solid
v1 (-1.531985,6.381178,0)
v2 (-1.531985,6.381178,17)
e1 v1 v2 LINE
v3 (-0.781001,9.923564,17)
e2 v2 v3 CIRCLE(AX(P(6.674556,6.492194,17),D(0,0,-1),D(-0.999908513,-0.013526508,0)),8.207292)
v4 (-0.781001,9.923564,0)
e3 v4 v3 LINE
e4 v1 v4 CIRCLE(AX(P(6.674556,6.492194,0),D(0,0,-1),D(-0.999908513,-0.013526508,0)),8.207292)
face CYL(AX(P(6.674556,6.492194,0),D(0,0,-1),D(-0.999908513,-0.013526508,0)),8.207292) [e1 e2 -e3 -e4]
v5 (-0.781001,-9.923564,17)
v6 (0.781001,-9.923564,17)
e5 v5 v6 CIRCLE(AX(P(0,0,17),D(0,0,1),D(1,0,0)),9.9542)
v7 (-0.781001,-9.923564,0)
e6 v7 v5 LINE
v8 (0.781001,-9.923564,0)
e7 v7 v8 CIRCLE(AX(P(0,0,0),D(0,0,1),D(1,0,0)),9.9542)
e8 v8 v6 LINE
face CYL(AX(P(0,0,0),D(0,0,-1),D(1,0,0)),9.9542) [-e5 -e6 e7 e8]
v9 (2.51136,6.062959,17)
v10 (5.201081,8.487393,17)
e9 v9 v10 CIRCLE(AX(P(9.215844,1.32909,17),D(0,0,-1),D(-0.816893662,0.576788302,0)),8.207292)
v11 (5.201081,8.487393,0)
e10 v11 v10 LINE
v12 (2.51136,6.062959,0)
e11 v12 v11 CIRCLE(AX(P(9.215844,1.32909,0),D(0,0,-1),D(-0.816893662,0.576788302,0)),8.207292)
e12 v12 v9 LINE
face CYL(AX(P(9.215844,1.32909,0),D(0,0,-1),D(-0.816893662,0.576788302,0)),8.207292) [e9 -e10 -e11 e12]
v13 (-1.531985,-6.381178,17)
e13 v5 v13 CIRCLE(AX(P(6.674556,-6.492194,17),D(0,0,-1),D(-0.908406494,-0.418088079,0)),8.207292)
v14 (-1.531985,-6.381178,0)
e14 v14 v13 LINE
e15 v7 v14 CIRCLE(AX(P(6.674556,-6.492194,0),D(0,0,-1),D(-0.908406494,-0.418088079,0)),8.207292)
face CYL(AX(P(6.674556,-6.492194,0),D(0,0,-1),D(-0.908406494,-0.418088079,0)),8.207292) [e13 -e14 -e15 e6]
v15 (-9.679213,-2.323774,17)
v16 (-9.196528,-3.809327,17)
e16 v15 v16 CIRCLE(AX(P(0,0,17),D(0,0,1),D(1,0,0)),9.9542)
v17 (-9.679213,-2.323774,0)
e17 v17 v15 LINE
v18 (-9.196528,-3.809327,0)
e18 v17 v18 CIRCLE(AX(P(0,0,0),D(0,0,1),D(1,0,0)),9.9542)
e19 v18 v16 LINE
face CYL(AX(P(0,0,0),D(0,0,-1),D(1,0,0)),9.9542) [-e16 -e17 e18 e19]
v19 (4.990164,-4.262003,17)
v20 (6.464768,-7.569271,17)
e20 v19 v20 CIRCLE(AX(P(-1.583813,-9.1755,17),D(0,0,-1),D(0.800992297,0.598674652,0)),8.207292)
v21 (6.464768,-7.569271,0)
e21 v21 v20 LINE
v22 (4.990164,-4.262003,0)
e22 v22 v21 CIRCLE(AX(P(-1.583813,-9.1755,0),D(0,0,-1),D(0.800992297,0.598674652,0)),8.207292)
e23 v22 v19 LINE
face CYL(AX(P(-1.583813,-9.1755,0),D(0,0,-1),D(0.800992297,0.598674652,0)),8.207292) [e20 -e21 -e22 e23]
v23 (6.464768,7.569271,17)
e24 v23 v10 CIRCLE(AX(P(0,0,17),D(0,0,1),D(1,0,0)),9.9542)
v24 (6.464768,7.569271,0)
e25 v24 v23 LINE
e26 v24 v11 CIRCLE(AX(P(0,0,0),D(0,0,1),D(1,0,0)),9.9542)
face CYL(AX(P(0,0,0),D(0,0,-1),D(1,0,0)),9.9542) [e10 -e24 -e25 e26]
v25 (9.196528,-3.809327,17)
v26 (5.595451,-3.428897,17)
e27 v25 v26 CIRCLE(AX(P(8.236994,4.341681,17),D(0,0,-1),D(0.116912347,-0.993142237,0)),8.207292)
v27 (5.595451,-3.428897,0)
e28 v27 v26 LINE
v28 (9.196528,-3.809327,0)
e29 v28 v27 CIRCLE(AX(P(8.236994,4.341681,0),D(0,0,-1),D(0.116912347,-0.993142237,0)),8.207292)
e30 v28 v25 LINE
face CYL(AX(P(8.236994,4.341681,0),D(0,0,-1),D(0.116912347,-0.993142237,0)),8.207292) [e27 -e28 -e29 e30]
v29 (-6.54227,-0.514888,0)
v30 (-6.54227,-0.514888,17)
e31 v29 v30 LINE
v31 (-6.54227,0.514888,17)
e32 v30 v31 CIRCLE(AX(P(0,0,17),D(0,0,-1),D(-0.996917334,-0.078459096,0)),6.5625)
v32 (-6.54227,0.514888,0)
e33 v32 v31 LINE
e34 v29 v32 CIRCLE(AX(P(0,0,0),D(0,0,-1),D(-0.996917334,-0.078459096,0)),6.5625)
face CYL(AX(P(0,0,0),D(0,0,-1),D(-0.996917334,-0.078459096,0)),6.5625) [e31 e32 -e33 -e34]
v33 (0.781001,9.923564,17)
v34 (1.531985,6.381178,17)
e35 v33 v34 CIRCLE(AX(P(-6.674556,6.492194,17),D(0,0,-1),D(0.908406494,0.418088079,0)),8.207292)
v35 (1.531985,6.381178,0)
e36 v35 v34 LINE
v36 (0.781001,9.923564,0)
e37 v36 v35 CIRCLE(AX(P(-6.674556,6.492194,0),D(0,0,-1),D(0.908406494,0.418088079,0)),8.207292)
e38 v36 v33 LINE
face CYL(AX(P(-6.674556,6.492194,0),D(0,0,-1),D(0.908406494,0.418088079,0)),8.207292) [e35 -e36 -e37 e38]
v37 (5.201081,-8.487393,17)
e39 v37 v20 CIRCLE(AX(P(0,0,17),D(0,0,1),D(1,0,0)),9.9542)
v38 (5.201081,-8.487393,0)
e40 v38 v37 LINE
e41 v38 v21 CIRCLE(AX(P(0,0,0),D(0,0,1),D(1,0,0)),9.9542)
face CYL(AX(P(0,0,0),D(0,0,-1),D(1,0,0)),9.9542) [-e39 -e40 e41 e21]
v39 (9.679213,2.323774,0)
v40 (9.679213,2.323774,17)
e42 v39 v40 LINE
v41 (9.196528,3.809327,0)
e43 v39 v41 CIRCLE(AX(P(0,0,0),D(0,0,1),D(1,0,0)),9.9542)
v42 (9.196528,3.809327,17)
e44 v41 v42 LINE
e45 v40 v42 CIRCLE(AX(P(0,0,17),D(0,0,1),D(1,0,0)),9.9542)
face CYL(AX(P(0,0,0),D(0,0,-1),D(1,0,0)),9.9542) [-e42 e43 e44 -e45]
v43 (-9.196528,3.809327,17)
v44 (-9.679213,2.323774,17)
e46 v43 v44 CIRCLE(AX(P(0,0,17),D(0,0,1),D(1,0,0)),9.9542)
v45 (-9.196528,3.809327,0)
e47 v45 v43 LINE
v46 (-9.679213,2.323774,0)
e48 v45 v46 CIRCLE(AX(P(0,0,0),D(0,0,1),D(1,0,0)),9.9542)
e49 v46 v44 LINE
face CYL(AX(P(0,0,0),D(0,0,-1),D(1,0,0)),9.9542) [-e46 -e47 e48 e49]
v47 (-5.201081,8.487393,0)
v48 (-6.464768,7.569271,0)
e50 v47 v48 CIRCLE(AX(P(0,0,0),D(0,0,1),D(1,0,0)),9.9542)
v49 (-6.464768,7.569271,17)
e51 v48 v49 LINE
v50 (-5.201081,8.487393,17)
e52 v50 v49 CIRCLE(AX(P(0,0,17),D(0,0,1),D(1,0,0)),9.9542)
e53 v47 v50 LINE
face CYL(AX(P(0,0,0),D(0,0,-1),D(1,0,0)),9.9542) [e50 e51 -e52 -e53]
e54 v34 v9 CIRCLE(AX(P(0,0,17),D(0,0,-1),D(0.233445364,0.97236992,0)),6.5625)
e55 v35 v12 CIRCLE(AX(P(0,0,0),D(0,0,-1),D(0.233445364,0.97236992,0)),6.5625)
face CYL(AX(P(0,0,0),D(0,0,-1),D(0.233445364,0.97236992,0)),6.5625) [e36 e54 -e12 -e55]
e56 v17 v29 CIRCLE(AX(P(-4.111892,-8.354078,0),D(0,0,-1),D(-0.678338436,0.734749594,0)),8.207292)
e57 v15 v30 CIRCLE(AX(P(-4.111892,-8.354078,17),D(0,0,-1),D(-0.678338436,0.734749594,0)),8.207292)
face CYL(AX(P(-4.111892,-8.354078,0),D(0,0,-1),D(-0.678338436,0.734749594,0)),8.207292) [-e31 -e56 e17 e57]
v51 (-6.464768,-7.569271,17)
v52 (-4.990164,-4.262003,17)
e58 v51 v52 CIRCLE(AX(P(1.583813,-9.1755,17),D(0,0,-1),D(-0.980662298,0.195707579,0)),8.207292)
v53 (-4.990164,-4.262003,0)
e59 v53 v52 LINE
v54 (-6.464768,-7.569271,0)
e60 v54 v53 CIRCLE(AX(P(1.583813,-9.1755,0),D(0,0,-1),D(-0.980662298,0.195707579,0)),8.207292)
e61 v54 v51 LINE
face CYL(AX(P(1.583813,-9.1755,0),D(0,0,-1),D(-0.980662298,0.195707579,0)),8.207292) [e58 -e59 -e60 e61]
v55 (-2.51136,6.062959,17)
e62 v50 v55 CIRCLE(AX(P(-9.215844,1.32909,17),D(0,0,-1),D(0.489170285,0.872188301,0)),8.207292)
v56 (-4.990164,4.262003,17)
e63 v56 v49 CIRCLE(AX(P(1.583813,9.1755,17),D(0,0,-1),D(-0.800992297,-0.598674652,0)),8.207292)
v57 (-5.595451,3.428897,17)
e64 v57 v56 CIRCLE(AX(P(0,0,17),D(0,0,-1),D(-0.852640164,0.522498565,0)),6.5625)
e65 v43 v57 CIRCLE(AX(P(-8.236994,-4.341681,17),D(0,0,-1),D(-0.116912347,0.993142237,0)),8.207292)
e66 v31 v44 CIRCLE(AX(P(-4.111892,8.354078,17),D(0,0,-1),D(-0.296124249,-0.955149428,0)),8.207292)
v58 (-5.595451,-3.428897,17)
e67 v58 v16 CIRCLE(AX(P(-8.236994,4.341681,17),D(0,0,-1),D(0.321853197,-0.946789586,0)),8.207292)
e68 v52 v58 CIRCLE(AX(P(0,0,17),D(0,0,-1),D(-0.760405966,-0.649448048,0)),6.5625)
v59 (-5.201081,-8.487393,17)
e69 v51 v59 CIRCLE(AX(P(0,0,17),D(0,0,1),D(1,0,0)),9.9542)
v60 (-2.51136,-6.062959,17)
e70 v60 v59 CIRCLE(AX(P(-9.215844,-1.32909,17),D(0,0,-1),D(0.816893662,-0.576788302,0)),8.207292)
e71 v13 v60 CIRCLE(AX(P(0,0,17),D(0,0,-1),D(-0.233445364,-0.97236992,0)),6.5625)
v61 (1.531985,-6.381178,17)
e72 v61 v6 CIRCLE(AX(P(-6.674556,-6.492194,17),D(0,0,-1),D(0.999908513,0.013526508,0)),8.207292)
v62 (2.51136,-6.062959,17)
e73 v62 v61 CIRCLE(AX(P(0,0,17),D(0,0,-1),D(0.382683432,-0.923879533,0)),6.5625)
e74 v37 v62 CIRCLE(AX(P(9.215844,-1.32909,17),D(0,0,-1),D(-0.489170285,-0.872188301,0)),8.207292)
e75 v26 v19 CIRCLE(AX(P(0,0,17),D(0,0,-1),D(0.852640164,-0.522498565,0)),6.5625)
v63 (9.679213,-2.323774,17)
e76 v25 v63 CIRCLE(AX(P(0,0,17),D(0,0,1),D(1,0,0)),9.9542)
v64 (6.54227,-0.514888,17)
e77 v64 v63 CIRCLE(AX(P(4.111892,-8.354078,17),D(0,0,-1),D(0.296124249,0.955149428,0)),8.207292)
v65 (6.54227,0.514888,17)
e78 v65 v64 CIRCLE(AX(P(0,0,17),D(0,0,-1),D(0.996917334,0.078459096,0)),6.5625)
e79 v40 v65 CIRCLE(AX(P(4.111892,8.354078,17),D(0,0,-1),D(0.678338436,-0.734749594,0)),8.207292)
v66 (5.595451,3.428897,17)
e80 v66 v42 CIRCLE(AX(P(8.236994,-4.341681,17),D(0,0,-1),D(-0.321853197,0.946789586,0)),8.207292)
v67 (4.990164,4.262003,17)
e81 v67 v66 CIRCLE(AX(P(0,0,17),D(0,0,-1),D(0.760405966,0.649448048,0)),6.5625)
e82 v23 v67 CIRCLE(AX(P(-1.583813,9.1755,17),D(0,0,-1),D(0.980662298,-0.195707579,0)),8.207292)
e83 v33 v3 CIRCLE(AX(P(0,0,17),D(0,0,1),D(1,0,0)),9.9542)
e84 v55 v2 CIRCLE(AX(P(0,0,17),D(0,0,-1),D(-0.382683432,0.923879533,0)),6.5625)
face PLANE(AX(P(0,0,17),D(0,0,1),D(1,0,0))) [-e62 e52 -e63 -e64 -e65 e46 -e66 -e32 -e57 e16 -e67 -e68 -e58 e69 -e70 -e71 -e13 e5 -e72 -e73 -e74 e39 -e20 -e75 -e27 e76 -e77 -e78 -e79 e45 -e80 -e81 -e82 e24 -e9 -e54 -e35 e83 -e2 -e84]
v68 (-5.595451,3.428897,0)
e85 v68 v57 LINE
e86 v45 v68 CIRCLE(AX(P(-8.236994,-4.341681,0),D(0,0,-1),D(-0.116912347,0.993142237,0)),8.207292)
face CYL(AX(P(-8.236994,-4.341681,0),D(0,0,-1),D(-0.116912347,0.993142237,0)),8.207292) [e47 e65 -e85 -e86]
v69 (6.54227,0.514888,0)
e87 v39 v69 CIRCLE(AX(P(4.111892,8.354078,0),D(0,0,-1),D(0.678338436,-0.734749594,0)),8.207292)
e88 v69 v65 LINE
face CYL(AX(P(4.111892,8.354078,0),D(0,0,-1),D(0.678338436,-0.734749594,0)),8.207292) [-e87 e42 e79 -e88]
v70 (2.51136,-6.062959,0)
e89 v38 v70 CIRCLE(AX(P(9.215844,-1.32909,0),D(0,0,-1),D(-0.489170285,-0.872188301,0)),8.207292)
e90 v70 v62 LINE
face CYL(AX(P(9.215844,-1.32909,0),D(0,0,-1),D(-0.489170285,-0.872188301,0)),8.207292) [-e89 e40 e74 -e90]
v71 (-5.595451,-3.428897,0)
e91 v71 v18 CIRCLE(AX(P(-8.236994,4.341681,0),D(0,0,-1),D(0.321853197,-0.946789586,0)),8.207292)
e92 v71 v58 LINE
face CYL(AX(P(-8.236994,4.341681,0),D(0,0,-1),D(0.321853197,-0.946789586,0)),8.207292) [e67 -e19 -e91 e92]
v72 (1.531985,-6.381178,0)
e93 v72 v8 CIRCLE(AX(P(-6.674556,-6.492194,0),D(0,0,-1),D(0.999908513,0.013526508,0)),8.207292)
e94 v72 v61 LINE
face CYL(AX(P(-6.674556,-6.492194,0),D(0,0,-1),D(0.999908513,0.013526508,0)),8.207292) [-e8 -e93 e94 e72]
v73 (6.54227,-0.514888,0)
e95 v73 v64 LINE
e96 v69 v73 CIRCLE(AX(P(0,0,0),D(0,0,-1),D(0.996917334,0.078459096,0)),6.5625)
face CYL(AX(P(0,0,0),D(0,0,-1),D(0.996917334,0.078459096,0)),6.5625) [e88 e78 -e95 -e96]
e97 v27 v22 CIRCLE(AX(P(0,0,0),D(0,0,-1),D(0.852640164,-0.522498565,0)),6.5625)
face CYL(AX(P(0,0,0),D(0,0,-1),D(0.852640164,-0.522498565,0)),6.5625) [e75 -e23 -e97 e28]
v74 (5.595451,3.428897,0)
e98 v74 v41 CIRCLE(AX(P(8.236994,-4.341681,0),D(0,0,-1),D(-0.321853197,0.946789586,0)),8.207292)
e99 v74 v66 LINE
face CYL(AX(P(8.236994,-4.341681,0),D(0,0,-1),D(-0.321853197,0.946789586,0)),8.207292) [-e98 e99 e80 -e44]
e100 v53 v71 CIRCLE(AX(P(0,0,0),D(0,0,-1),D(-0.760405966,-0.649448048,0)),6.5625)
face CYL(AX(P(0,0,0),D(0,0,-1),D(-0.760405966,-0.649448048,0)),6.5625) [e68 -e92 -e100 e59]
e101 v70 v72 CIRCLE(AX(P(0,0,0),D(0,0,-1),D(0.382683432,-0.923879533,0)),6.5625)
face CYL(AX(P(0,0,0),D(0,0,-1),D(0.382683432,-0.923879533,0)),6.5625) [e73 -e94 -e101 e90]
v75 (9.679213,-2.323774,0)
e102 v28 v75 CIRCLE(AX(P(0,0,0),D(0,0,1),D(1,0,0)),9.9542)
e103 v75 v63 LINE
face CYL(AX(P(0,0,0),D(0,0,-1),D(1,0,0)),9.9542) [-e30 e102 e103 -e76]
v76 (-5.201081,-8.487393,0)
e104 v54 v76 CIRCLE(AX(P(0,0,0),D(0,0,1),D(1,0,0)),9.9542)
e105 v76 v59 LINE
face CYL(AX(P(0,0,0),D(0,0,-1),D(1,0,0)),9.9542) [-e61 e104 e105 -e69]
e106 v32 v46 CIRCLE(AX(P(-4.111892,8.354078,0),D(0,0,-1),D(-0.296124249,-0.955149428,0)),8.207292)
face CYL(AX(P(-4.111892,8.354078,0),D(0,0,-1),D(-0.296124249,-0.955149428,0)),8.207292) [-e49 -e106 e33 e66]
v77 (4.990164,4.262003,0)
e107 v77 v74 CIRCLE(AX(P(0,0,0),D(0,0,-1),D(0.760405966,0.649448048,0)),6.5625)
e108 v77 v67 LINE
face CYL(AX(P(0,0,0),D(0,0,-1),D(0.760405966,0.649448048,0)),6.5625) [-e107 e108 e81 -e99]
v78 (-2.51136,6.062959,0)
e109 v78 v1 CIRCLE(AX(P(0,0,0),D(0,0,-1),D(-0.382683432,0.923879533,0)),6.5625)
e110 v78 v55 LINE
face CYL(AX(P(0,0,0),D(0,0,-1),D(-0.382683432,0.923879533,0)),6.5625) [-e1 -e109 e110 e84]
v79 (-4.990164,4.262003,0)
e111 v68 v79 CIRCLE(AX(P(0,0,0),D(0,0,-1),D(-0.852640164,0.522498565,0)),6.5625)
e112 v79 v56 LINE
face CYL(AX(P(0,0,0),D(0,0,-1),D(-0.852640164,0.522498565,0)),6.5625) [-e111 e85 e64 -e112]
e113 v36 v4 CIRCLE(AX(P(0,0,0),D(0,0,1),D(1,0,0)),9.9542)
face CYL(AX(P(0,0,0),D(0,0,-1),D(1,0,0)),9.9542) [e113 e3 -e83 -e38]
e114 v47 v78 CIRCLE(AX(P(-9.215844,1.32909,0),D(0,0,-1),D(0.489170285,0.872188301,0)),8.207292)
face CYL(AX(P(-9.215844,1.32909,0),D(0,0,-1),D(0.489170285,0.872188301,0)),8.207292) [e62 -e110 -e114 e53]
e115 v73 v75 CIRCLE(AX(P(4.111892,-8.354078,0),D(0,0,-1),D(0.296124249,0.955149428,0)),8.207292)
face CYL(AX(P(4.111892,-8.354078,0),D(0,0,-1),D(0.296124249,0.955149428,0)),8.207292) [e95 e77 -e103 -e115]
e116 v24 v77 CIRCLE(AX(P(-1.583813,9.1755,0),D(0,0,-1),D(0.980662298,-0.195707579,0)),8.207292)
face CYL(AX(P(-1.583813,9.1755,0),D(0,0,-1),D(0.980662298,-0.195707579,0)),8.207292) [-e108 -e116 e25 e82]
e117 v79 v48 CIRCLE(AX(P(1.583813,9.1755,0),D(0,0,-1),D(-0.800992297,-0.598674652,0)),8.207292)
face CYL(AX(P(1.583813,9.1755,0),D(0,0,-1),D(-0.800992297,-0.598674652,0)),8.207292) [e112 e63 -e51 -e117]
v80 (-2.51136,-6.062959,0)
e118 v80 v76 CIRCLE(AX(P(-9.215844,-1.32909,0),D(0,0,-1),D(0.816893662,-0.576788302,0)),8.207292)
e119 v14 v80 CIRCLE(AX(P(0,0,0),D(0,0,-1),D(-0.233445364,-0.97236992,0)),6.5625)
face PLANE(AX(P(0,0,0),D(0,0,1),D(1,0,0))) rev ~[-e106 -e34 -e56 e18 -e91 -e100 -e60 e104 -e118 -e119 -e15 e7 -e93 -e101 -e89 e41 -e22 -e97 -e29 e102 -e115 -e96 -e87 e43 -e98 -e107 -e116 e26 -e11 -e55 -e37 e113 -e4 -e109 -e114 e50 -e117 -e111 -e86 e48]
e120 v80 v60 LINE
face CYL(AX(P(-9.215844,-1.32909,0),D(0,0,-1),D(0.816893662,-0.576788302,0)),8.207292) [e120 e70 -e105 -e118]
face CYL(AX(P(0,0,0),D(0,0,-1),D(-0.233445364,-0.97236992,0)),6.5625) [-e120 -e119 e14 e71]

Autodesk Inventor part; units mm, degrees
sketch "Sketch1" plane through (0, 0, 0) normal (0, 0, 1) x (1, 0, 0)
  circle A0 centre (0, 0) radius 9.9542
  dimension "d0" = 19.9085
extrude "Extrusion1" add sketch "Sketch1" along normal blind 17
ref_plane "Work Plane2" through (0, 0, 8.5) normal (0, 0, 1) x (1, 0, 0)
sketch "Sketch2" plane through (0, 0, 0) normal (0, 0, -1) x (-1, 0, 0)
  circle A0 centre (0, 0) radius 9.9542 projected
  circle A1 centre (0, 0) radius 8.75
  dimension "d3" = 17.5
surface extrude "Pitch Diameter" sketch "Sketch2" against normal through all shown no curves A1
ref_plane "Work Plane8" through (0, 0, 0) normal (0.9510565, 0.309017, 0) x (0, 0, 1)
ref_plane "Work Plane9" through (0, 0, 0) normal (1, 0, 0) x (0, 1, 0)
spur gear teeth "Spur Gear" teeth 10 pitch diameter 17.5 tip diameter 19.9085 root diameter 13.125 face width 17 start plane through (0, 0, 0) normal (0, 0, -1) x (-1, 0, 0)
equation "\"d0\" = da_da"
equation "\"d1\" = da_b"
equation "\"d3\" = da_d"
equation "\"d16\" = da_aw"
equation "\"d43\" = da_aw"
equation "\"d46\" = da_aw"
equation "\"da_da\" = 19.908492"
equation "\"da_b\" = 17"
equation "\"da_d\" = 17.5"
equation "\"da_aw\" = 50.031786"
properties part number "Spur Gear1" material "Steel"
